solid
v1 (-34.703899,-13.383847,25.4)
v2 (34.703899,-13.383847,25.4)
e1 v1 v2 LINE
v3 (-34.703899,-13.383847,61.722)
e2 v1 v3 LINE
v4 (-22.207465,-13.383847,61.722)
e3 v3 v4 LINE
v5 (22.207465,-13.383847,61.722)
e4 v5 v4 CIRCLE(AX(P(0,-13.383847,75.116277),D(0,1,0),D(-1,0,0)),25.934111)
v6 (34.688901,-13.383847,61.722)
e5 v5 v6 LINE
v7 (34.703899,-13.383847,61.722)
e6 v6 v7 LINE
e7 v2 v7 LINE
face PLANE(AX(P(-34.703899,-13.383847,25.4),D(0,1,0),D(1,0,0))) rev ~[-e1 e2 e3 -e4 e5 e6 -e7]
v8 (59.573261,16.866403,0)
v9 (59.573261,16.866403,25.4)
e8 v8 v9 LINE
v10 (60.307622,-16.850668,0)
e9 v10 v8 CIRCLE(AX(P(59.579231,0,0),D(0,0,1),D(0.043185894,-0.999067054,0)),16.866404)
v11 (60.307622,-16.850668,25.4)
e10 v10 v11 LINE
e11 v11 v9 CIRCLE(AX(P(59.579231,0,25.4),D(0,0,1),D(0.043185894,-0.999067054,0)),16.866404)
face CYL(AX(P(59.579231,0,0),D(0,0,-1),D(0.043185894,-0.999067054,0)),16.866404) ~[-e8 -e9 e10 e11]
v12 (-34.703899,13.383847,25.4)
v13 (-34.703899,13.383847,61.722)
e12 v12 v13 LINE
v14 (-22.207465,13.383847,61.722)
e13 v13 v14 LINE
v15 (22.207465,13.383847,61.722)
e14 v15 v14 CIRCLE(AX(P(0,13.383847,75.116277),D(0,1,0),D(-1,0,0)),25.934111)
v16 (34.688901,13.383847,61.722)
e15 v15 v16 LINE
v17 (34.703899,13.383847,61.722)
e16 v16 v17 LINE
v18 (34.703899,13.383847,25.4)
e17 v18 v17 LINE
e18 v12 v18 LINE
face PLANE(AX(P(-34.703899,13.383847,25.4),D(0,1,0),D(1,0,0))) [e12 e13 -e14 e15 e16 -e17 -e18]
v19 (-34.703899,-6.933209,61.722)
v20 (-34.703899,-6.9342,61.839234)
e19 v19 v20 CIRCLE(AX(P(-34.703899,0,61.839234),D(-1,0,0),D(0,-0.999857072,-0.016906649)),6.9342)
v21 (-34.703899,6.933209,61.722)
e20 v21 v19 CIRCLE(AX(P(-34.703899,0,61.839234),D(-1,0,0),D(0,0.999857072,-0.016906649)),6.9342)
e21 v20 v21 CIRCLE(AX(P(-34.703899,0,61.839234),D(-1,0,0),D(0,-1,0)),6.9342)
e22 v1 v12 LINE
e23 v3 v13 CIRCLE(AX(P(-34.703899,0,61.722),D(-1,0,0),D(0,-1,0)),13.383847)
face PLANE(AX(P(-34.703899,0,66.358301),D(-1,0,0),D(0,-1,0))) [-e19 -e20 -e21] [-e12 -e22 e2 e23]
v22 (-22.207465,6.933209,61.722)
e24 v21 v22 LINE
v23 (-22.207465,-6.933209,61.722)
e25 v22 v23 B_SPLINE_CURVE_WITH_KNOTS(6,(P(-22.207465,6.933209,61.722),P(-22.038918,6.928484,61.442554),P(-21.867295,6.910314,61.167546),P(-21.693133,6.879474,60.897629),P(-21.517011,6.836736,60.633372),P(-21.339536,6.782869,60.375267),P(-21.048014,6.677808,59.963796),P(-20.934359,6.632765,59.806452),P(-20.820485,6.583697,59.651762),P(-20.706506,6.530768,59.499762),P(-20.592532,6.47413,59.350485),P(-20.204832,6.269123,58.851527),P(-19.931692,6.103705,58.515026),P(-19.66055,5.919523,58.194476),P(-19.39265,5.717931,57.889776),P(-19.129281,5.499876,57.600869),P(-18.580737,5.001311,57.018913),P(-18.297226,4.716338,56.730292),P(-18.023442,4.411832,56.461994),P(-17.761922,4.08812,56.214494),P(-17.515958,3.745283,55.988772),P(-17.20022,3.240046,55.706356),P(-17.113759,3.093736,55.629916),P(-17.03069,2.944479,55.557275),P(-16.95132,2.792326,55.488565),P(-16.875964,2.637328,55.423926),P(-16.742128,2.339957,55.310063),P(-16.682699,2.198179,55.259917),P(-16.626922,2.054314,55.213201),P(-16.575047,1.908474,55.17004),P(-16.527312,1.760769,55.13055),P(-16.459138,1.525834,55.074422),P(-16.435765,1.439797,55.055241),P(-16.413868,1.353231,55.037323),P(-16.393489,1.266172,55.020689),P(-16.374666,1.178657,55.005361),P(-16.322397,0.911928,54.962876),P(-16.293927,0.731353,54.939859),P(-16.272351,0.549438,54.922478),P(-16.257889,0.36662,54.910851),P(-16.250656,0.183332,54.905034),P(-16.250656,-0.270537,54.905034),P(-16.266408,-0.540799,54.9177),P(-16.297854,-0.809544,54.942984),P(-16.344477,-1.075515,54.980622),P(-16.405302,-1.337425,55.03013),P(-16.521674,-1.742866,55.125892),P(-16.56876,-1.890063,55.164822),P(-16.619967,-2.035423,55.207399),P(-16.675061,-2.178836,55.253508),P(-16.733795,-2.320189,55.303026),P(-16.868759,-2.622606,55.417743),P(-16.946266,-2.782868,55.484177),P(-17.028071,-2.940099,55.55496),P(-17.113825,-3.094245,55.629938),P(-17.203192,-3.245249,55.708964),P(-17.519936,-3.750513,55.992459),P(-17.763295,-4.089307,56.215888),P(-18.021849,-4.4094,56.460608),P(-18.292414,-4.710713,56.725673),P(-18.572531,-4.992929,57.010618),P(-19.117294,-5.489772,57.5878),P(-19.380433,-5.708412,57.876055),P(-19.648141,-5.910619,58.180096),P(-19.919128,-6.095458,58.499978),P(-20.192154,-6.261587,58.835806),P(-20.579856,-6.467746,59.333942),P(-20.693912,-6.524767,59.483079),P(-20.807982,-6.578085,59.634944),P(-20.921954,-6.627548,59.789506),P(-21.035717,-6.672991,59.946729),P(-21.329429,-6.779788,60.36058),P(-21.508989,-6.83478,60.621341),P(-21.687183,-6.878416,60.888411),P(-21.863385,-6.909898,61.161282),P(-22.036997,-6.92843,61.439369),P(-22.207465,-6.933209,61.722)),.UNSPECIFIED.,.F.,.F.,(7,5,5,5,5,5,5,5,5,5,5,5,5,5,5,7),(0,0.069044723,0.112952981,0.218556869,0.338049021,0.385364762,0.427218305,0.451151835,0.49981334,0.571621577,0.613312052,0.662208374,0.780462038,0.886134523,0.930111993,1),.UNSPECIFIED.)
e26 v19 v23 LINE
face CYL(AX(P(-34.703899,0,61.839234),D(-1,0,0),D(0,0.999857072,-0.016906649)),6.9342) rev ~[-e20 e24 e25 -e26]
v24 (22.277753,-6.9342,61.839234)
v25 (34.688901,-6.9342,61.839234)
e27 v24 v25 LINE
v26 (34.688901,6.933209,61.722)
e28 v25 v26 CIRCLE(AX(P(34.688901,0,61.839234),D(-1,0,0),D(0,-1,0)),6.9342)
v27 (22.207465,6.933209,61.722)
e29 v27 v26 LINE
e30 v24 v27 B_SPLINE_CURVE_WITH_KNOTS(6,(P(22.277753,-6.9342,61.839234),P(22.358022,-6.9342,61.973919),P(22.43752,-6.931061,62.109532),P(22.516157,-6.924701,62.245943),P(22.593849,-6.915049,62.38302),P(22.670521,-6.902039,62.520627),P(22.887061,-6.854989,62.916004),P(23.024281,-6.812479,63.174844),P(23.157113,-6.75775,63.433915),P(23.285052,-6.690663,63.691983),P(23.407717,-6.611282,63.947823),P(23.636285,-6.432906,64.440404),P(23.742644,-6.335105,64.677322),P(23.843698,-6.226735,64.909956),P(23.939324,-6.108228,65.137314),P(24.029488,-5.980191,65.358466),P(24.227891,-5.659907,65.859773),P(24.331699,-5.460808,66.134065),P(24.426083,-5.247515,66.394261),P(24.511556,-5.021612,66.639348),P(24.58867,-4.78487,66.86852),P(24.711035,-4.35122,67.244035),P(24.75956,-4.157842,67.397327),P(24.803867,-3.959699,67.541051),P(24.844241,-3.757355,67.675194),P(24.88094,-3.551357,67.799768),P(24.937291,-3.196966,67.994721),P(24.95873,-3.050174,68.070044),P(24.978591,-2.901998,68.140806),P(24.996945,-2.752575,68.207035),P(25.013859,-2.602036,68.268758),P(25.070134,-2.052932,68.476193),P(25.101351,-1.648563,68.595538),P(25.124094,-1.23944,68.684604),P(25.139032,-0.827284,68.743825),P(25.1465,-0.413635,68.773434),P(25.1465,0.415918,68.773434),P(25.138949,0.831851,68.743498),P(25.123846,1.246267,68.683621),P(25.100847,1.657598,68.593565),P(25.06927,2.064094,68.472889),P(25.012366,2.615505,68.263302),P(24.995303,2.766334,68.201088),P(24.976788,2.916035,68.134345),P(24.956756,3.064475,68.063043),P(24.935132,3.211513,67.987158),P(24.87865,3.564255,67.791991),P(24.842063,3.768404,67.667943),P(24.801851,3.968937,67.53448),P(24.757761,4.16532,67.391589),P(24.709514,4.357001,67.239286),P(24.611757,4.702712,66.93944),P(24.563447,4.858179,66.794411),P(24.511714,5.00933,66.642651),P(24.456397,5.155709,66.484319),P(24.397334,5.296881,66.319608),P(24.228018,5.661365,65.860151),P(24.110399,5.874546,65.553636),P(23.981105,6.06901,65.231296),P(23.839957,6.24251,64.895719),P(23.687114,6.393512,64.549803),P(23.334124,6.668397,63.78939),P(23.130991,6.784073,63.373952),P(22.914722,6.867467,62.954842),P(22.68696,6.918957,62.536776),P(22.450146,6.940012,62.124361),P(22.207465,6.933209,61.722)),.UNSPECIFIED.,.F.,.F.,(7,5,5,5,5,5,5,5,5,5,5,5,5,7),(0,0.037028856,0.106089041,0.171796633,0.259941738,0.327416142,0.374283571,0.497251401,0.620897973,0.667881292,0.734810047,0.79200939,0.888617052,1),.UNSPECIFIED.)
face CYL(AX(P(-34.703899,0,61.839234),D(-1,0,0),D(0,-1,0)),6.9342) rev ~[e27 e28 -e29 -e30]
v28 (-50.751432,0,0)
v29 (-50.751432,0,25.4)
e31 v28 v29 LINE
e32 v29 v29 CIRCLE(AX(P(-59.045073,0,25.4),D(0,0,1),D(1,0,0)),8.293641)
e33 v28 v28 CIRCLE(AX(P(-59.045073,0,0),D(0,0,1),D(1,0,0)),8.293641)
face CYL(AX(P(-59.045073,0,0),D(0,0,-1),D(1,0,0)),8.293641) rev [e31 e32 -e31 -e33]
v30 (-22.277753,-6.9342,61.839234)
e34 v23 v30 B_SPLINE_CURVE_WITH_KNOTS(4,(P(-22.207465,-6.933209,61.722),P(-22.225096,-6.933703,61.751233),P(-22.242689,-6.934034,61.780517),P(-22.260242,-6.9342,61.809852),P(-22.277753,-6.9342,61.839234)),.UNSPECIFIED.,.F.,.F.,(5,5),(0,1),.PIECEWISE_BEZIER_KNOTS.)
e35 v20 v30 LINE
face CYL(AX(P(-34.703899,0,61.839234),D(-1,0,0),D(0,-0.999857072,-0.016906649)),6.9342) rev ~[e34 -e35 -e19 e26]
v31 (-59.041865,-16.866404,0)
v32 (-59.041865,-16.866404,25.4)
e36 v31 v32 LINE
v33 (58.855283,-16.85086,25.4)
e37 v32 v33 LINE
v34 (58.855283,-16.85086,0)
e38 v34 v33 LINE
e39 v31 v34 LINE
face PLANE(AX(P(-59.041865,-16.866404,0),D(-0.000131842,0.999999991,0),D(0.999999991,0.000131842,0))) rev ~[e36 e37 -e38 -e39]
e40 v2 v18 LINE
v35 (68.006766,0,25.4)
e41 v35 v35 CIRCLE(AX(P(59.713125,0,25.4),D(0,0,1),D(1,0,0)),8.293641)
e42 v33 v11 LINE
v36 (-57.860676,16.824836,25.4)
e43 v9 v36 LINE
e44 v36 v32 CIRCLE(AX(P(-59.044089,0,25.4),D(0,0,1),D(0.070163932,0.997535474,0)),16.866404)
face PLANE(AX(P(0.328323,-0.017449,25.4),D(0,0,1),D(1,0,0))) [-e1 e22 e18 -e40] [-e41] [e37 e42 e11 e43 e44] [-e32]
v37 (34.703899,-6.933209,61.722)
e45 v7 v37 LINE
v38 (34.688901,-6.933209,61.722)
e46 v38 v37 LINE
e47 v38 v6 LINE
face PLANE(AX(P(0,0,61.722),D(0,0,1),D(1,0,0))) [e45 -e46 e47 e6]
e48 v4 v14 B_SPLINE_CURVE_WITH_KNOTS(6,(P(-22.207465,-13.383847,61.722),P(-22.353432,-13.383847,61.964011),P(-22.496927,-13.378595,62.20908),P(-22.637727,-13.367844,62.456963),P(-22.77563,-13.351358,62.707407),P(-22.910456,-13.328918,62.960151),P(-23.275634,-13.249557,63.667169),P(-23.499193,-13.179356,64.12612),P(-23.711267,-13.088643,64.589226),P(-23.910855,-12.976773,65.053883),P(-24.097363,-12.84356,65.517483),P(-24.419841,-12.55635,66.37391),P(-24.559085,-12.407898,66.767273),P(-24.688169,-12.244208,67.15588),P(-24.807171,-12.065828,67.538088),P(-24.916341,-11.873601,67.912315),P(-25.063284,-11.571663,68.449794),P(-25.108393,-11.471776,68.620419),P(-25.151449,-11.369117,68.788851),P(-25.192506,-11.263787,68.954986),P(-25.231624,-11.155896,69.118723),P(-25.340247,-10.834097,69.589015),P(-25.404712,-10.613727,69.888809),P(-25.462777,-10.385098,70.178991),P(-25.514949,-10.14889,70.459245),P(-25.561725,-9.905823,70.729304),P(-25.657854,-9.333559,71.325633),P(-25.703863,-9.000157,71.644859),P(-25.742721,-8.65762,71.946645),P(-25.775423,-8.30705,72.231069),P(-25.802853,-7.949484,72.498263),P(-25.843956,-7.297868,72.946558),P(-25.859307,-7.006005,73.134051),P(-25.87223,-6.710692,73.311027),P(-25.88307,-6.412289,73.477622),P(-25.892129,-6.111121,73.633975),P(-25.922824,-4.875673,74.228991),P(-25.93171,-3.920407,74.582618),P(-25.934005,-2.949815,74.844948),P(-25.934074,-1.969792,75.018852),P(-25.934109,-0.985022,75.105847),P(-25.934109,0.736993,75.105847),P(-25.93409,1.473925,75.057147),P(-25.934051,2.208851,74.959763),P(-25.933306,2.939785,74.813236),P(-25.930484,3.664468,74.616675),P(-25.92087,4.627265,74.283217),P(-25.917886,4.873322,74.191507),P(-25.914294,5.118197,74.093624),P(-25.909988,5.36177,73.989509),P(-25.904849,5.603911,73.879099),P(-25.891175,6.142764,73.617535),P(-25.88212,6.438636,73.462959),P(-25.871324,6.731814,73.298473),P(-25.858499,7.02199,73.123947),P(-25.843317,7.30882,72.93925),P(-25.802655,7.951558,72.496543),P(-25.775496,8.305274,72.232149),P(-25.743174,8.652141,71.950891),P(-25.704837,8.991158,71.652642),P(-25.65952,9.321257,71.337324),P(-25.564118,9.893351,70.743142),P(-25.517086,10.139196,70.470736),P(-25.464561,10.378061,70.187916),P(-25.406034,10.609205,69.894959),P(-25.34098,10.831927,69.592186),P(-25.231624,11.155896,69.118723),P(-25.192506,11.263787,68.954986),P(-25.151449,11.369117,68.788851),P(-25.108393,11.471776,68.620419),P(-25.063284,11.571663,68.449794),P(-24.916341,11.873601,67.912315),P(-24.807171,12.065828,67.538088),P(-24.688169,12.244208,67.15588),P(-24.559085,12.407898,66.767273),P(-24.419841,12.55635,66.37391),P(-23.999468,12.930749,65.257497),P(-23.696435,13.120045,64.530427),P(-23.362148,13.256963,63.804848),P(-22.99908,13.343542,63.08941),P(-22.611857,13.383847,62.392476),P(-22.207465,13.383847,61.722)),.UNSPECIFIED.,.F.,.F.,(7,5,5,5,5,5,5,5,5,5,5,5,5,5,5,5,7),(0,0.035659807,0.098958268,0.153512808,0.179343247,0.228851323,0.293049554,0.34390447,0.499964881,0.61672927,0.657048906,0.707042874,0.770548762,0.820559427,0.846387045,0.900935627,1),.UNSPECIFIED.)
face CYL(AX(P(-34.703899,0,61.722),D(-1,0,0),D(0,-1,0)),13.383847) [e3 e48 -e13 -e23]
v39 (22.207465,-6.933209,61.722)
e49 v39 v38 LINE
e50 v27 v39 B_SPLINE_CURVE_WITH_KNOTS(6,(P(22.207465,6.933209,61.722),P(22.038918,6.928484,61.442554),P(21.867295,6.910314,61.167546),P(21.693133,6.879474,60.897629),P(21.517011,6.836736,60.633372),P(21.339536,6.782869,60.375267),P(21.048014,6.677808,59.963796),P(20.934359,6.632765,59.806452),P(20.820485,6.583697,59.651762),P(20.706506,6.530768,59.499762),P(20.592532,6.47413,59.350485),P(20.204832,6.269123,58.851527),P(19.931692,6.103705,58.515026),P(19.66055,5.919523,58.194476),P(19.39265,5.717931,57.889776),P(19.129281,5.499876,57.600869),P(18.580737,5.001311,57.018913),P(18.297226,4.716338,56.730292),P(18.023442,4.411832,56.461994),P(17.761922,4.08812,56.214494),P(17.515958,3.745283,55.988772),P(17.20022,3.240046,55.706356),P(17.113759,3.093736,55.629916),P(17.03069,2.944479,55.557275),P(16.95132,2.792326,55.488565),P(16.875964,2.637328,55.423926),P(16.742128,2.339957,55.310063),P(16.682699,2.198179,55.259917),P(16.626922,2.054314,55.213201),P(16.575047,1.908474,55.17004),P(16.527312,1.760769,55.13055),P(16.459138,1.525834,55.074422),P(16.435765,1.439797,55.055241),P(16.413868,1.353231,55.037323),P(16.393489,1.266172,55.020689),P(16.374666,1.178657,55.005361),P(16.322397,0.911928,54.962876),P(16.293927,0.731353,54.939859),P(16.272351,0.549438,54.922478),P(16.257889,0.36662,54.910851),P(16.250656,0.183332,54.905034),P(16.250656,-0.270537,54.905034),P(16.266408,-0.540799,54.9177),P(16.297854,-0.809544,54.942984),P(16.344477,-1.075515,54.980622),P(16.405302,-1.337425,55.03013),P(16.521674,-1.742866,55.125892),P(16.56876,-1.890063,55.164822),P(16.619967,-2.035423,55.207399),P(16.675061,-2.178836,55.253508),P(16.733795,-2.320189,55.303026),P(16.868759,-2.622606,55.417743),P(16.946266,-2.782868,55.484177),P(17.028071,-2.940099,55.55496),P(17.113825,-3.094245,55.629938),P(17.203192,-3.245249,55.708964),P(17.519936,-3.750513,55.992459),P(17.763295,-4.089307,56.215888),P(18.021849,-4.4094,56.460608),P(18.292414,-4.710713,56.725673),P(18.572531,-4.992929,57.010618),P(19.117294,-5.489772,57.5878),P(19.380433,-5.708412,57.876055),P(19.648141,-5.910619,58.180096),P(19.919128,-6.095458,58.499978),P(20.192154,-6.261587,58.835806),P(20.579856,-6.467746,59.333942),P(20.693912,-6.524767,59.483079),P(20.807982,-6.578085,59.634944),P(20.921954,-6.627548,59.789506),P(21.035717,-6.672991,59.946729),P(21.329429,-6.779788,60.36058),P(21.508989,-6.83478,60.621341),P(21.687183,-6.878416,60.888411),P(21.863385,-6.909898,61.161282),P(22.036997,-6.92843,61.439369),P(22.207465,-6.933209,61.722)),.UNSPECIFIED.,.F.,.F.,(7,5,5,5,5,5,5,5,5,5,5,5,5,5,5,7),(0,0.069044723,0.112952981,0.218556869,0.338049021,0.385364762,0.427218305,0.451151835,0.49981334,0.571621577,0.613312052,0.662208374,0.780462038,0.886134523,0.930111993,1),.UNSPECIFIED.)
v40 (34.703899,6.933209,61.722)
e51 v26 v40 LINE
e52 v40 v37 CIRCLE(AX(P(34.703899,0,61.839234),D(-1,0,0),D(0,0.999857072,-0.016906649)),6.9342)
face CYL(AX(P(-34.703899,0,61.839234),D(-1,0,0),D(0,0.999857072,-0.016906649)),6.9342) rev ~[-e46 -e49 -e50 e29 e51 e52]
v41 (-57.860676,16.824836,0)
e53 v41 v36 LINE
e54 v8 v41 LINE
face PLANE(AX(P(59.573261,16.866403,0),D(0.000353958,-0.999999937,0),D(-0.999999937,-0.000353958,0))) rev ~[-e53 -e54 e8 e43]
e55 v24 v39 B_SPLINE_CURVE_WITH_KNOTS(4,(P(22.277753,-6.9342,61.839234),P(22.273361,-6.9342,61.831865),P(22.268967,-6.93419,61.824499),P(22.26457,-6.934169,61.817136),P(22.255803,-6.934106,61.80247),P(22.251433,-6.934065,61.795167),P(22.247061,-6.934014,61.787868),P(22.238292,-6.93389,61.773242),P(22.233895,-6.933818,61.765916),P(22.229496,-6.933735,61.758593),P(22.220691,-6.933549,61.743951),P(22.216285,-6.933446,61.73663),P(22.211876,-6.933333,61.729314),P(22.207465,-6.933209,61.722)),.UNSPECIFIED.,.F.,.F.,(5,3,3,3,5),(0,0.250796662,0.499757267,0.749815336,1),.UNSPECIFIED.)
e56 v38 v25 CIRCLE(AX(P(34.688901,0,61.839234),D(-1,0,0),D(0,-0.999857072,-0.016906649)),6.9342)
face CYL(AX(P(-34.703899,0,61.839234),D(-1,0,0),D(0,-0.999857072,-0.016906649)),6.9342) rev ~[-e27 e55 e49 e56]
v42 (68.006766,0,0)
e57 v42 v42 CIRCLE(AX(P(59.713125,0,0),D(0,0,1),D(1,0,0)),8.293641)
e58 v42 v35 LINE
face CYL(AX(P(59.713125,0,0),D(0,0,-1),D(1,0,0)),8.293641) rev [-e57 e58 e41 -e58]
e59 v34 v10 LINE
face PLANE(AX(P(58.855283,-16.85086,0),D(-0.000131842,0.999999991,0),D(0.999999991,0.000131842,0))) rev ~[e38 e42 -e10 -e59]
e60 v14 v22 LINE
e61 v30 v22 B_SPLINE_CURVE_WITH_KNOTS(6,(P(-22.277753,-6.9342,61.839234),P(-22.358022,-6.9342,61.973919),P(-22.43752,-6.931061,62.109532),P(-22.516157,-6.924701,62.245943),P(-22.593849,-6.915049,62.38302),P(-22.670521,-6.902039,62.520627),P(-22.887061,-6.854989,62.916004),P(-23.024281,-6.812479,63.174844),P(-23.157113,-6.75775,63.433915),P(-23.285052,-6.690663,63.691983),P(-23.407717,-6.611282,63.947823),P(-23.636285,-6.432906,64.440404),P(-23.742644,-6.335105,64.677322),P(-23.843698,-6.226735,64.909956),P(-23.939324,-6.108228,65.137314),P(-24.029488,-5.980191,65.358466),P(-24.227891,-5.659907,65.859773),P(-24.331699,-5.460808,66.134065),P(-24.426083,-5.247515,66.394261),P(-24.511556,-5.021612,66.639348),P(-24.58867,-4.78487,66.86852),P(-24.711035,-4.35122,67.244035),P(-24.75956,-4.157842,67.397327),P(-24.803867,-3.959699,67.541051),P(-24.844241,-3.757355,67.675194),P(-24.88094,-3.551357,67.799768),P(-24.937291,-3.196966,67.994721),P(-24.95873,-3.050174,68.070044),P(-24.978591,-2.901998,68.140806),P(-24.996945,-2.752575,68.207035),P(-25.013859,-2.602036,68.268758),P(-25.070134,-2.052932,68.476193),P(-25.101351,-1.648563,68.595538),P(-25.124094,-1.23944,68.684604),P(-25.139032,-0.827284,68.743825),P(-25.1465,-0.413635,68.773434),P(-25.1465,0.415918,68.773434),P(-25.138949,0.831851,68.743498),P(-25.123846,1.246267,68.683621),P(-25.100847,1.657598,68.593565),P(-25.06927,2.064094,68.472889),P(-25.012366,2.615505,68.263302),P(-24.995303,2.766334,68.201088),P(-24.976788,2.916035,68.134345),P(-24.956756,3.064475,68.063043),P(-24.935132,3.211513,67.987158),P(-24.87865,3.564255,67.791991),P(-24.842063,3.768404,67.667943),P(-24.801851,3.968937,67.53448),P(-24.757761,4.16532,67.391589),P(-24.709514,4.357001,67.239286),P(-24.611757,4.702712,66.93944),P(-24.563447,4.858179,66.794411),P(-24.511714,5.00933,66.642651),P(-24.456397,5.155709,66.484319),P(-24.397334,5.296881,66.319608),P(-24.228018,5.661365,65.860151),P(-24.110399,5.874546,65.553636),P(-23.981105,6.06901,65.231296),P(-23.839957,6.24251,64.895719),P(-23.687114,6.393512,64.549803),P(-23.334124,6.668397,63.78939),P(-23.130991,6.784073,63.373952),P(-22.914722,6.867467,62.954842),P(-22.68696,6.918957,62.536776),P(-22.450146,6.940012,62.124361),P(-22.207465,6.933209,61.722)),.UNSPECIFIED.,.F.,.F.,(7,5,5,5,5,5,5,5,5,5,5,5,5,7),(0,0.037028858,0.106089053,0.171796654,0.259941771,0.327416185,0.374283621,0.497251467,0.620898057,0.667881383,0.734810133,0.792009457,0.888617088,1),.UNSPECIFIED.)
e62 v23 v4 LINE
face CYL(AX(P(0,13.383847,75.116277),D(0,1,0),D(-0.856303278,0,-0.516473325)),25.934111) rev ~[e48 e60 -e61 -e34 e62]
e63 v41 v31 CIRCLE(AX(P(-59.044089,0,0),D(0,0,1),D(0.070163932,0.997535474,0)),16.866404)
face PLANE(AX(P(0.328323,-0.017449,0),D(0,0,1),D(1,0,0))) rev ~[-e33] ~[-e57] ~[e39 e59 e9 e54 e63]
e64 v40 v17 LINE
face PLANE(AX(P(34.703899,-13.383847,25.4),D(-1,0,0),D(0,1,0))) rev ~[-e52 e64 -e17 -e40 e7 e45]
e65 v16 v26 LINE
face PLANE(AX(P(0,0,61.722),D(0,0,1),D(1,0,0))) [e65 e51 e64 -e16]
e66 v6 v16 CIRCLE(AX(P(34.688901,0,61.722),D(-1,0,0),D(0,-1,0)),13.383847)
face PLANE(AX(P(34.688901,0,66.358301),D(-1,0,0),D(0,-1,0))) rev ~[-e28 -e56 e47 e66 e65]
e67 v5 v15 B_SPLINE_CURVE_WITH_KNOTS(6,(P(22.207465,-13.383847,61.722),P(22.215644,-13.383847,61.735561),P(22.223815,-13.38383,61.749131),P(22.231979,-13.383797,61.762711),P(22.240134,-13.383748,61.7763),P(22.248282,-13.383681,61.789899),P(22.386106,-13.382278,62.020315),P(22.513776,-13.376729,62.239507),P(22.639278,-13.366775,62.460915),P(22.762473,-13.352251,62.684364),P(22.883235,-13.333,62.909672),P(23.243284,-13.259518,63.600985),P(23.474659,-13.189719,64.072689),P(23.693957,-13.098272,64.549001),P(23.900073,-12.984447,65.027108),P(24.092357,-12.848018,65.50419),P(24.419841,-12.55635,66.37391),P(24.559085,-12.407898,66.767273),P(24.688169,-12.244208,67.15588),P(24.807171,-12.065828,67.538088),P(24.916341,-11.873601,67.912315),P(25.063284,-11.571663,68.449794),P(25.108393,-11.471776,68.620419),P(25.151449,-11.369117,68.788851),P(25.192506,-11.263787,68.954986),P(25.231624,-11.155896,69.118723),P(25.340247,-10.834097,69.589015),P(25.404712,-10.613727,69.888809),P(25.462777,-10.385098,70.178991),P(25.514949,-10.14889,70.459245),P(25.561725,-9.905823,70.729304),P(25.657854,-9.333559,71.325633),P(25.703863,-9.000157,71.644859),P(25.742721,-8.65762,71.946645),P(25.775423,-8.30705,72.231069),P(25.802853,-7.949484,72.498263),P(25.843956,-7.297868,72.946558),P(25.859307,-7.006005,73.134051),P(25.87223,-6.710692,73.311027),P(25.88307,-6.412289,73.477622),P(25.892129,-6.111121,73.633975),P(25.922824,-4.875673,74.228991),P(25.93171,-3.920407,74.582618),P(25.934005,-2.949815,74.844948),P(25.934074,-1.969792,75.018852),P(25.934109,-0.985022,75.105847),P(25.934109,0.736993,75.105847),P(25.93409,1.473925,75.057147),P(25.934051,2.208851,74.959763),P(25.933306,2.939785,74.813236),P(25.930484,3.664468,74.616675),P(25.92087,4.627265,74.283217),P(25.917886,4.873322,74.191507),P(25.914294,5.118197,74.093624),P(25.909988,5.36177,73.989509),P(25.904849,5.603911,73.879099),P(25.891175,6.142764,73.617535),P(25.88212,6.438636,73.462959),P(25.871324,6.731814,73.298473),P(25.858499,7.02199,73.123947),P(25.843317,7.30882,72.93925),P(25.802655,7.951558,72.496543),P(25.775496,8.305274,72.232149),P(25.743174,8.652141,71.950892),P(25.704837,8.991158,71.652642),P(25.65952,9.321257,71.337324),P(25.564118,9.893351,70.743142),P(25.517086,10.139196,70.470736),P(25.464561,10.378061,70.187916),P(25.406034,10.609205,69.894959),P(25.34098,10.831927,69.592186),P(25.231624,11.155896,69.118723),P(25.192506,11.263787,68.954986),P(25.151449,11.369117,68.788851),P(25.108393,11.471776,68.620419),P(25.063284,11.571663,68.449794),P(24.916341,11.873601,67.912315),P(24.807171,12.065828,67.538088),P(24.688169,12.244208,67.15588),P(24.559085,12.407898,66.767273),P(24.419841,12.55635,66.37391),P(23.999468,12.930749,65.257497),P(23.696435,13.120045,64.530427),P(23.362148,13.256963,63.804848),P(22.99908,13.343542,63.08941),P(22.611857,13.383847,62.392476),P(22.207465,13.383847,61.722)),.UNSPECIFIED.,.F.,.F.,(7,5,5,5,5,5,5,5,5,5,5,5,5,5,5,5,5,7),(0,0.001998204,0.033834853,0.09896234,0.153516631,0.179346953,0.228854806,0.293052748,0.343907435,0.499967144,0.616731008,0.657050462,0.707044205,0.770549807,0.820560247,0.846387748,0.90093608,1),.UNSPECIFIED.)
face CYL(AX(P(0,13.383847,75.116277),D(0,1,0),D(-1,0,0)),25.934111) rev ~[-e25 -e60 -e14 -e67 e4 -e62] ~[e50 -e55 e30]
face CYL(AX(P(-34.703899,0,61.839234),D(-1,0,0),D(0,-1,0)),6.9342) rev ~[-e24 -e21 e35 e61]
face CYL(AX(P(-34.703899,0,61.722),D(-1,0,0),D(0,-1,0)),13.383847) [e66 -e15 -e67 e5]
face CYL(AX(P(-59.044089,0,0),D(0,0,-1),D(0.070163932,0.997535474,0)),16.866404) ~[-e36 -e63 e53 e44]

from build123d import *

# Parameters (mm, degrees)
F1_R      = 8.2936411115
F2_DEPTH  = 25.4
F3_W      = 69.4077983499
F3_H      = 26.76769346
F4_DEPTH  = 36.322
F7_DEPTH  = 69.3928
F8_DEPTH  = 100.584
F10_DEPTH = 29.464


with BuildPart() as f2:
    # F1 (on face) → F2 (new body)
    with BuildSketch(Plane.XY):
        with BuildLine():
            ThreePointArc((60.3076215597, -16.8506682543), (76.4416354881, 0.3672646239), (59.5732608546, 16.8664026399))
            Line((59.5732608546, 16.8664026399), (-57.860675973, 16.8248360129))
            ThreePointArc((-57.860675973, 16.8248360129), (-75.9001367339, 0.5909603363), (-59.041865465, -16.8664035499))
            Line((-59.041865465, -16.8664035499), (58.8552834129, -16.8508597338))
            Line((58.8552834129, -16.8508597338), (60.3076215597, -16.8506682543))
        make_face()
        with Locations((-59.0450726449, 0)):
            Circle(F1_R, mode=Mode.SUBTRACT)
        with Locations((59.7131252289, 0)):
            Circle(F1_R, mode=Mode.SUBTRACT)
    extrude(amount=F2_DEPTH)

    # F3 (on face) → F4 (join)
    with BuildSketch(Plane.XY.offset(25.4)):
        Rectangle(F3_W, F3_H)
    extrude(amount=F4_DEPTH)

    # F5 (on face) → F7 (join)
    with BuildSketch(Plane(origin=(-34.7038991749, 0, 0), x_dir=(0, -1, 0), z_dir=(-1, 0, 0))):
        with BuildLine():
            Line((-13.38384673, 61.722), (13.38384673, 61.722))
            ThreePointArc((13.38384673, 61.722), (0, 75.10584673), (-13.38384673, 61.722))
        make_face()
    extrude(amount=-F7_DEPTH)

    # F6 (on face) → F8 (cut)
    with BuildSketch(Plane(origin=(-34.7038991749, 0, 0), x_dir=(0, -1, 0), z_dir=(-1, 0, 0))):
        with BuildLine():
            Line((6.9332089114, 61.722), (-6.9332089114, 61.722))
            ThreePointArc((-6.9332089114, 61.722), (0, 54.9050340839), (6.9332089114, 61.722))
        make_face()
        with BuildLine():
            ThreePointArc((6.9332089114, 61.722), (6.9339522234, 61.7806149473), (6.9342, 61.8392340839))
            ThreePointArc((6.9342, 61.8392340839), (-0.0586191366, 68.7731863073), (-6.9332089114, 61.722))
            Line((-6.9332089114, 61.722), (6.9332089114, 61.722))
        make_face()
    extrude(amount=-F8_DEPTH, mode=Mode.SUBTRACT)

    # F9 (on face) → F10 (cut)
    with BuildSketch(Plane(origin=(0, 13.38384673, 0), x_dir=(-1, 0, 0), z_dir=(0, 1, 0))):
        with BuildLine():
            ThreePointArc((22.2074646178, 61.722), (24.9850855062, 68.1647563019), (25.9341114011, 75.116276741))
            ThreePointArc((25.9341114011, 75.116276741), (-6.9515204391, 100.1013622472), (-22.2074646178, 61.722))
            Line((-22.2074646178, 61.722), (22.2074646178, 61.722))
        make_face()
        with BuildLine():
            Line((22.2074646178, 61.722), (-22.2074646178, 61.722))
            ThreePointArc((-22.2074646178, 61.722), (0, 49.1821653399), (22.2074646178, 61.722))
        make_face()
    extrude(amount=-F10_DEPTH, mode=Mode.SUBTRACT)


solid = f2.part
